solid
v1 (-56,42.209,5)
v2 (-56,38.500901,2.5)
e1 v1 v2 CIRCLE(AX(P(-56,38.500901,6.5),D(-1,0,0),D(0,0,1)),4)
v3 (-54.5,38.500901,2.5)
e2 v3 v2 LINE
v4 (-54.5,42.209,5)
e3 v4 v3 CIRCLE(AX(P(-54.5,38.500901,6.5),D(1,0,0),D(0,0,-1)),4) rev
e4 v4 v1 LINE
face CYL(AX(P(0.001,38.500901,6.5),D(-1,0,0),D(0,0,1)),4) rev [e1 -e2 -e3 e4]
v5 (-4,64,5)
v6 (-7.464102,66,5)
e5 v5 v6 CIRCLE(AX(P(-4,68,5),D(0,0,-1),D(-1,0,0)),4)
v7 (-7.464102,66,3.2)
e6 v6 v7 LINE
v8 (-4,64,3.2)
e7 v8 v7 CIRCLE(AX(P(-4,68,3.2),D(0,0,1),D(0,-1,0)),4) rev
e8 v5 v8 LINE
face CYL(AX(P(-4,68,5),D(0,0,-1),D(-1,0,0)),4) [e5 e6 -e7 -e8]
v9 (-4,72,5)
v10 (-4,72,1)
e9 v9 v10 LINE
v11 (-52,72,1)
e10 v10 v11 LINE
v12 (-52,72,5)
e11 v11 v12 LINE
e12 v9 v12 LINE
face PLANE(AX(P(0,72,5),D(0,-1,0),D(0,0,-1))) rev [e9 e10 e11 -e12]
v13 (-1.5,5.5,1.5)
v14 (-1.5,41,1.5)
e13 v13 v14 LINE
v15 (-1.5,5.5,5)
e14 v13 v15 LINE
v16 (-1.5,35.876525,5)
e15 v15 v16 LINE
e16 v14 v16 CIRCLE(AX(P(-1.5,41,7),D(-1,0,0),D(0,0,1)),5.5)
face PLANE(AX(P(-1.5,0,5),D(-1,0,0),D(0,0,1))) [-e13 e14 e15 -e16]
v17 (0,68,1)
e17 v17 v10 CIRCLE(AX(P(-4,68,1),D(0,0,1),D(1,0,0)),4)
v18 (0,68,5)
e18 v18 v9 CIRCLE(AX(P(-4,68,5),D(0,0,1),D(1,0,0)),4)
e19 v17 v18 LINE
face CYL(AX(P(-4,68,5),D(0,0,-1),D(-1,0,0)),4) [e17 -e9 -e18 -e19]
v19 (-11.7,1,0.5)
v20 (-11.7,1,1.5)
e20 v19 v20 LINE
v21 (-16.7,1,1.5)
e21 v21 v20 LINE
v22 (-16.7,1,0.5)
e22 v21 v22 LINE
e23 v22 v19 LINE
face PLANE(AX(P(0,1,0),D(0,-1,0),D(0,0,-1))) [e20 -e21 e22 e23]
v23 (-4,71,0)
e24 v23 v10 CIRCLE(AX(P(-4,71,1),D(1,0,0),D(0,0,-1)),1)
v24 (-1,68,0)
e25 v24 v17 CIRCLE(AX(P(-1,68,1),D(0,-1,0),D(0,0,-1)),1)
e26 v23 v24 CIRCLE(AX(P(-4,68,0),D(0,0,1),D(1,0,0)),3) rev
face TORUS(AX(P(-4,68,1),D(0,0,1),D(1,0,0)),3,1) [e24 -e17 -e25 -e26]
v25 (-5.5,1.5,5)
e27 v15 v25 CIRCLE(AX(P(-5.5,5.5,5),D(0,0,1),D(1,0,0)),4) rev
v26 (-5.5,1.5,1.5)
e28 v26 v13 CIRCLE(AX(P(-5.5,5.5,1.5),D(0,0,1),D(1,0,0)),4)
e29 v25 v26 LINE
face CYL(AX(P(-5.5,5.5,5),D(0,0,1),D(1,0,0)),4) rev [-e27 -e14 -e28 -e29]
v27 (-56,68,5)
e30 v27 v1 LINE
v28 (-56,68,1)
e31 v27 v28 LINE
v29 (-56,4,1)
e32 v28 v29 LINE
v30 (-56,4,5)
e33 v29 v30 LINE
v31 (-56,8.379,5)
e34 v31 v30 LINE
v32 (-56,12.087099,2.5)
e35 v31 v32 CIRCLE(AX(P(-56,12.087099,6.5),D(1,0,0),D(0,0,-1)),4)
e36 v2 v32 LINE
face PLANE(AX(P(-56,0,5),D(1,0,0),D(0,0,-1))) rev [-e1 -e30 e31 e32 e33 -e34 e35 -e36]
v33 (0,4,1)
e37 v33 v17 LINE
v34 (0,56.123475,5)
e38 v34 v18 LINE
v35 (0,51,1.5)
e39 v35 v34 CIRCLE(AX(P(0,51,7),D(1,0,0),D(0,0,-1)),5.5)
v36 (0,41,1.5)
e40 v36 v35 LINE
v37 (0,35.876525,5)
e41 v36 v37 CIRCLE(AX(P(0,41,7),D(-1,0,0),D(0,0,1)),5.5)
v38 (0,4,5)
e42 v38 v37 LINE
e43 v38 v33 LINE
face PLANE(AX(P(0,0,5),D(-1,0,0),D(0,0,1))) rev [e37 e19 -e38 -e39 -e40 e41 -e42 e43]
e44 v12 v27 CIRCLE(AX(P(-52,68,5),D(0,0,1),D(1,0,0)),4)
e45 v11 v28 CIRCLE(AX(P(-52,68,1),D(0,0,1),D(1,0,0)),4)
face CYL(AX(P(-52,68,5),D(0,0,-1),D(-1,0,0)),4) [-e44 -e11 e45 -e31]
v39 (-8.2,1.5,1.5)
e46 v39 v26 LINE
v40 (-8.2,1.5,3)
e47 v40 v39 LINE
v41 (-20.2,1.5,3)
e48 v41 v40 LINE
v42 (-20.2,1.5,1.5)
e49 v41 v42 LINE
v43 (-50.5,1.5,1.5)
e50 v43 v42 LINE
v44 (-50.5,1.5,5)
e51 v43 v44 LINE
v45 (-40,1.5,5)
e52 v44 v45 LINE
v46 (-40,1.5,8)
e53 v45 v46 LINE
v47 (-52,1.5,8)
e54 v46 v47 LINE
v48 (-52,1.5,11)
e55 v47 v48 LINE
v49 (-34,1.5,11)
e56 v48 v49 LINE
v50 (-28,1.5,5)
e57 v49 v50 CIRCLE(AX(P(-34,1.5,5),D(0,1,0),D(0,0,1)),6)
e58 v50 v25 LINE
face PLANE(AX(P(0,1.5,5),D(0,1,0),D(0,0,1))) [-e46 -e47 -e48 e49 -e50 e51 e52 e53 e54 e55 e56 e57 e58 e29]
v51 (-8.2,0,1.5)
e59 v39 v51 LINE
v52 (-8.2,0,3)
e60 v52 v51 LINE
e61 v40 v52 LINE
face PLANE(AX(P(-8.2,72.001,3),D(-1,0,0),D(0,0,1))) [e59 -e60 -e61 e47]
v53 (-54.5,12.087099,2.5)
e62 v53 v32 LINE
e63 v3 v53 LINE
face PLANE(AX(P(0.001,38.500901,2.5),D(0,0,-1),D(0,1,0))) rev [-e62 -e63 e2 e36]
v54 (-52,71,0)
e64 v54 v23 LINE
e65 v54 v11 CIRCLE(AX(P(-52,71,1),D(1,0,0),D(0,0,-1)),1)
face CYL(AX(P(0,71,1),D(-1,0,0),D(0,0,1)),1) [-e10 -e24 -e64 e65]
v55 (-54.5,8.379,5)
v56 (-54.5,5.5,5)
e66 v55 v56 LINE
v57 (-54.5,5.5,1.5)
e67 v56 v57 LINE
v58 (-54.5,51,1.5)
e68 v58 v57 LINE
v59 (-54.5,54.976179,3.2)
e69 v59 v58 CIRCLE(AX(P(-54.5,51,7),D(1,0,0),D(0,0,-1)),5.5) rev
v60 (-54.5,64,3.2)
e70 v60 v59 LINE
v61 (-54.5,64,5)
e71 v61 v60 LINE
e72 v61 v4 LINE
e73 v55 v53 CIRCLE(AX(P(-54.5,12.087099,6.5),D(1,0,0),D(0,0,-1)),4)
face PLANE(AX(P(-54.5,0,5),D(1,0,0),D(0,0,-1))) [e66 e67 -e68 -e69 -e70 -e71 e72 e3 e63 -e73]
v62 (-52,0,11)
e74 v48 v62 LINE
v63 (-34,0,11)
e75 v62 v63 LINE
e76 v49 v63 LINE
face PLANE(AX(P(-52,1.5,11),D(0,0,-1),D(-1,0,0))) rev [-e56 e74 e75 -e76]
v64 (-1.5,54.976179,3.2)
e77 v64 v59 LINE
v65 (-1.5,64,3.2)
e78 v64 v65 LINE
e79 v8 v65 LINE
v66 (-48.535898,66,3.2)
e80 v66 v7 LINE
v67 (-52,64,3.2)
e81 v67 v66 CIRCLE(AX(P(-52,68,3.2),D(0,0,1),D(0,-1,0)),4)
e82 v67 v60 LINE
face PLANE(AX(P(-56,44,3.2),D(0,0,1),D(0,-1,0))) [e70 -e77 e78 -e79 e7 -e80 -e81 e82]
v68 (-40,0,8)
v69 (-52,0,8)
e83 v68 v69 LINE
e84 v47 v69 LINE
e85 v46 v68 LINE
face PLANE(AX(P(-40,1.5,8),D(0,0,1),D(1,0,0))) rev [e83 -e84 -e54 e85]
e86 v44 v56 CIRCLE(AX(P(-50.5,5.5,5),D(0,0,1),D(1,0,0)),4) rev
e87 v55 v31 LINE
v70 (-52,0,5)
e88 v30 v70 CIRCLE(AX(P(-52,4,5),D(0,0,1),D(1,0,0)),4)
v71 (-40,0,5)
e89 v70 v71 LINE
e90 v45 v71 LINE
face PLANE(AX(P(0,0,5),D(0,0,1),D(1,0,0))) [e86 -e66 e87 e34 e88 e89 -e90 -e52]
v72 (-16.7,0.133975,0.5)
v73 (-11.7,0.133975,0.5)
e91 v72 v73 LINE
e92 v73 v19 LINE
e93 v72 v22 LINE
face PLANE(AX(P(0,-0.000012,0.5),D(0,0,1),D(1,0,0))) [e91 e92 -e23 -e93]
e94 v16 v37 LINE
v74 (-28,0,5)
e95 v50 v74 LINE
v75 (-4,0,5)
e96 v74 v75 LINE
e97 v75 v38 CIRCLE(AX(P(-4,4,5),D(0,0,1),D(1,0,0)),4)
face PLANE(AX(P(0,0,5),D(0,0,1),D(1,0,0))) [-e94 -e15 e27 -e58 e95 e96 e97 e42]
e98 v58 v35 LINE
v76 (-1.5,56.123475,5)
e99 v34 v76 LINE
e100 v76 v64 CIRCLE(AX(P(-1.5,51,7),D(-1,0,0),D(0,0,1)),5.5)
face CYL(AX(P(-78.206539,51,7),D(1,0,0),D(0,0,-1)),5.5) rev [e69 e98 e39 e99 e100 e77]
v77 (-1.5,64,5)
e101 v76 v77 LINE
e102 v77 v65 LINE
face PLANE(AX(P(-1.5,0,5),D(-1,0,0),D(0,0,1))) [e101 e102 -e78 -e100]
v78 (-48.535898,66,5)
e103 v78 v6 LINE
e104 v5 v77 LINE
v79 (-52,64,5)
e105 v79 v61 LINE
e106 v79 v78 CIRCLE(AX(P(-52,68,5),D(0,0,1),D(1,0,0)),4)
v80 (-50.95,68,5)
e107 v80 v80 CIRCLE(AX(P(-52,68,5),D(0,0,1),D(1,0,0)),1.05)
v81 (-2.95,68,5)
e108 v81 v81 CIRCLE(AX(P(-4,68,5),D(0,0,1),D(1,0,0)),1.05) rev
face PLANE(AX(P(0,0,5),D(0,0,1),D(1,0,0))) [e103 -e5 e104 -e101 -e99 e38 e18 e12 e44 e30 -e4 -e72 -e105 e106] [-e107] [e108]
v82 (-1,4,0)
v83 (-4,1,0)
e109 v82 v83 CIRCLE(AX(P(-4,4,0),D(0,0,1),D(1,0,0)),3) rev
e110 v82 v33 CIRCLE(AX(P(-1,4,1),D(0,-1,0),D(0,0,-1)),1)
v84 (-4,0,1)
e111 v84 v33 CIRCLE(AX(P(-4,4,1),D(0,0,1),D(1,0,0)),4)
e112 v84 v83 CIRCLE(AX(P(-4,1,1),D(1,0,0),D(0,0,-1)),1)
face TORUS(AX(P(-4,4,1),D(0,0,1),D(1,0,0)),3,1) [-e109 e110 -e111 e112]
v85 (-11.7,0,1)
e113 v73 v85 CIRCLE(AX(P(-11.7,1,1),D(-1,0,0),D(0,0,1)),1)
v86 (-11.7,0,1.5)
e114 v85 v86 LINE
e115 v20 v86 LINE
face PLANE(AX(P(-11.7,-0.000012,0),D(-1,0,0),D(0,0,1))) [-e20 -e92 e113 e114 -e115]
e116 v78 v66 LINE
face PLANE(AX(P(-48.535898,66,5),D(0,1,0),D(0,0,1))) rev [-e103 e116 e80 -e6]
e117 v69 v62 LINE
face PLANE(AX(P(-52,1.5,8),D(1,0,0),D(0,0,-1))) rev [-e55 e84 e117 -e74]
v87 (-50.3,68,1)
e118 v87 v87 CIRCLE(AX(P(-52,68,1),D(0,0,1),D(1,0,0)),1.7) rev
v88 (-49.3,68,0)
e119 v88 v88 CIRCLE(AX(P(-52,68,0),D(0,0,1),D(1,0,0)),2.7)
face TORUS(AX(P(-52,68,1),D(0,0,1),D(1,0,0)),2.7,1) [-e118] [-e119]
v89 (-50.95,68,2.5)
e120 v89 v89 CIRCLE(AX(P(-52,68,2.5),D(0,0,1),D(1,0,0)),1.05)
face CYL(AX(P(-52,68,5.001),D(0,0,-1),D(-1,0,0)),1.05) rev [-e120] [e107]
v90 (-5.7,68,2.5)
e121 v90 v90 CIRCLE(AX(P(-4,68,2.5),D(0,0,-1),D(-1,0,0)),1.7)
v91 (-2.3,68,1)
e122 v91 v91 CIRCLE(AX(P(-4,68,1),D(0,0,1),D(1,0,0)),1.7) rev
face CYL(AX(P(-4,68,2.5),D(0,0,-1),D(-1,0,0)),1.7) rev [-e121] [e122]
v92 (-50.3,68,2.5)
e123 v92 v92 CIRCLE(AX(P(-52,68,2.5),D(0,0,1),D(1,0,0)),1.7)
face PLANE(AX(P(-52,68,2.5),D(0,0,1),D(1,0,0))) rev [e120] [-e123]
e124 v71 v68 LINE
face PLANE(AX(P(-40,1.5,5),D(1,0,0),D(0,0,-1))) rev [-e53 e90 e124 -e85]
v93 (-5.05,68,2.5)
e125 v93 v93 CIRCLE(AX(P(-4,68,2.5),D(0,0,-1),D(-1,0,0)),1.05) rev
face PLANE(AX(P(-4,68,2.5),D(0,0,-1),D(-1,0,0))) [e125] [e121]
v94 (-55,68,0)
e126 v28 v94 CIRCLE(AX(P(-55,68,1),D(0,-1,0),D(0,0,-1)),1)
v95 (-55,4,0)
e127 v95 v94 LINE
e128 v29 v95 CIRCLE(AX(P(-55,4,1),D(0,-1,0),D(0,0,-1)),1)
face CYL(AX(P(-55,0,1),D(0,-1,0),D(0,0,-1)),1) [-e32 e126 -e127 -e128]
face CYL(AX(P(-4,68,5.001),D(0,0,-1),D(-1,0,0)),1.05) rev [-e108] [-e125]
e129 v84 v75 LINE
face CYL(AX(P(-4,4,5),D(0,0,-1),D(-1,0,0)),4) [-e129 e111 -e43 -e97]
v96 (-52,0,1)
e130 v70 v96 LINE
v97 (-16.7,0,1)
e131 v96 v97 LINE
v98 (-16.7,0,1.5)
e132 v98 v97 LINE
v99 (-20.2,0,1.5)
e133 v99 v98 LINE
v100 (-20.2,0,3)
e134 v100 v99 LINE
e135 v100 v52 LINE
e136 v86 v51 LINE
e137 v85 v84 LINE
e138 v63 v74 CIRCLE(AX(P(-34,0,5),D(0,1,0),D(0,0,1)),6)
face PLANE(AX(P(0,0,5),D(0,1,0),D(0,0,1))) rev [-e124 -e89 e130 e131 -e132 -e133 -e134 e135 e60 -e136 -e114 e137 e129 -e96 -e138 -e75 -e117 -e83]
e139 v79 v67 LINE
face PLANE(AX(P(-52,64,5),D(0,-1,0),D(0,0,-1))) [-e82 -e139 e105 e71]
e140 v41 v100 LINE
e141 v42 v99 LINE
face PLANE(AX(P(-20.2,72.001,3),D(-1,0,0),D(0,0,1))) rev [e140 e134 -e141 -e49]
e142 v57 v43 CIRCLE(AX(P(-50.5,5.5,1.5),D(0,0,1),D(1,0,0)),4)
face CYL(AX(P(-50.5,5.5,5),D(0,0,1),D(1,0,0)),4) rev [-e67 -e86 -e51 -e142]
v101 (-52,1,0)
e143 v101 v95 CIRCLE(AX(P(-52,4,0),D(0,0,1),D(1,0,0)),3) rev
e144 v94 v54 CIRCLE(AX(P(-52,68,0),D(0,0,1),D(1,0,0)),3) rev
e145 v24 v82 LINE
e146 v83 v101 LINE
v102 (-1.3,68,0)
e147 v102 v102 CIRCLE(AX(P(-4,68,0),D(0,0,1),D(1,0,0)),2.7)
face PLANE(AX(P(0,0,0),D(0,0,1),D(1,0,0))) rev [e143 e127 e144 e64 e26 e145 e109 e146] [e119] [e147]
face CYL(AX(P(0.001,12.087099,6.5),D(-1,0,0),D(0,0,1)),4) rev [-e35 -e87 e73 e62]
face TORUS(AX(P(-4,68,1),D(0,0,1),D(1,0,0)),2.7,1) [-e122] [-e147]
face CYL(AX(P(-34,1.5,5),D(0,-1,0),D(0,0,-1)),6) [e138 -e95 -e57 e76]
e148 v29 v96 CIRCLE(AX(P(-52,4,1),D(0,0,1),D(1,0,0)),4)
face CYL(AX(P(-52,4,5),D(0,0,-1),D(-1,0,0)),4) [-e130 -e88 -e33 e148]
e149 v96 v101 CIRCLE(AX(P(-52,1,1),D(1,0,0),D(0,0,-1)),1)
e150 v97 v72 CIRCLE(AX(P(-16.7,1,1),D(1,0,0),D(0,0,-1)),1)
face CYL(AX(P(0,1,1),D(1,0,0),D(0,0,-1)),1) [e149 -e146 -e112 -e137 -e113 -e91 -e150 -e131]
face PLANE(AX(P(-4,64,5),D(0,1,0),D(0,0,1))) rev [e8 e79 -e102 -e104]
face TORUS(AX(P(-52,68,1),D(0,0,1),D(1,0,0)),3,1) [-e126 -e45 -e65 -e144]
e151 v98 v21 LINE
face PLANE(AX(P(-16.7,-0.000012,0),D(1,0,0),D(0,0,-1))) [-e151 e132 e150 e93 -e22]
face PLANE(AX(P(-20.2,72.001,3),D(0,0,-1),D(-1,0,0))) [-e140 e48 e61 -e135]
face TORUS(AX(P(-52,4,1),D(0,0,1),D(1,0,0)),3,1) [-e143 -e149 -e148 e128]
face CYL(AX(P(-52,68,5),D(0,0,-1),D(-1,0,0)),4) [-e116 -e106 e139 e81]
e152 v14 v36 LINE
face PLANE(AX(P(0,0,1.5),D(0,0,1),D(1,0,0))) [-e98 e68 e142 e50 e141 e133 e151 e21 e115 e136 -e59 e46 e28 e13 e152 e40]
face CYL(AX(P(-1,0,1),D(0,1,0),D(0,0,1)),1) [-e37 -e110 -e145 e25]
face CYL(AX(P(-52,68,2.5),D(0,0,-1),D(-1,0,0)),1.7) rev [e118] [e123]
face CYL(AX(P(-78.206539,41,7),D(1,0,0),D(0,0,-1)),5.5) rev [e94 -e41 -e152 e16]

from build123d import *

# Parameters (mm, degrees)
SKETCH_1_W               = 56
SKETCH_1_H               = 72
EXTRUDE_1_DEPTH          = 5
SHELL_1_T                = -1.5
EXTRUDE_2_DEPTH          = 5
EXTRUDE_4_REACH          = 93.351
SKETCH_11_W              = 3.2
SKETCH_11_H              = 28
CUT_EXTRUDE_1_REACH      = 93.351
SKETCH_2_7_R             = 1.05
SKETCH_2_8_R             = 1.7
CUT_EXTRUDE_2_DEPTH      = 2.5
EXTRUDE_3_DEPTH          = 1.5
CUT_EXTRUDE_3_REACH      = 93.875
SKETCH_10_3_W            = 12
SKETCH_10_3_H            = 1.5
CUT_EXTRUDE_4_DEPTH      = 92.874914966
CUT_EXTRUDE_4_DEPTH_BACK = 1
SKETCH_10_4_W            = 5
SKETCH_10_4_H            = 1
CUT_EXTRUDE_5_REACH      = 93.875
CUT_EXTRUDE_START        = -54.5
CUT_EXTRUDE_6_DEPTH      = 54.5
FILLET_1_R               = 4
FILLET_2_R               = 4
FILLET_3_R               = 1


with BuildPart() as part:
    # 草图1 → 凸台-拉伸1 (new body)
    with BuildSketch(Plane.XY):
        with Locations((-28, 36)):
            Rectangle(SKETCH_1_W, SKETCH_1_H)
    extrude(amount=EXTRUDE_1_DEPTH)

    # 抽壳1
    shell_1_openings = [part.faces().sort_by_distance(p)[0] for p in [
        (-28, 36, 5),
    ]]
    offset(amount=SHELL_1_T, openings=shell_1_openings, kind=Kind.INTERSECTION)

    # 草图2 → 凸台-拉伸2 (add)
    with BuildSketch(Plane.XY):
        with BuildLine():
            Line((0, 72), (0, 68))
            ThreePointArc((0, 68), (-0.394448725, 66.267949192), (-1.5, 64.877501001))
            Line((-1.5, 64.877501001), (-1.5, 64))
            Line((-1.5, 64), (-4, 64))
            ThreePointArc((-4, 64), (-6, 64.535898385), (-7.464101615, 66))
            Line((-7.464101615, 66), (-48.535898385, 66))
            ThreePointArc((-48.535898385, 66), (-50, 64.535898385), (-52, 64))
            Line((-52, 64), (-54.5, 64))
            Line((-54.5, 64), (-54.5, 64.877501001))
            ThreePointArc((-54.5, 64.877501001), (-55.605551275, 66.267949192), (-56, 68))
            Line((-56, 68), (-56, 72))
            Line((-56, 72), (0, 72))
        make_face()
    extrude(amount=EXTRUDE_2_DEPTH)

    # 草图11 → 凸台-拉伸4 (add, up to next)
    with BuildSketch(Plane(origin=(0, 0, 0), x_dir=(0, 0, -1), z_dir=(1, 0, 0)), mode=Mode.PRIVATE) as extrude_4_sk1:
        with Locations((-1.6, 58)):
            Rectangle(SKETCH_11_W, SKETCH_11_H)
    extrude_4_tool1 = extrude(extrude_4_sk1.sketch, amount=-EXTRUDE_4_REACH, mode=Mode.PRIVATE) - part.part
    add(extrude_4_tool1.solids().sort_by_distance((0, 58, 1.6))[0])

    # 草图2<7> → 切除-拉伸1 (cut, up to next)
    with BuildSketch(Plane.XY, mode=Mode.PRIVATE) as cut_extrude_1_sk1:
        with Locations((-52, 68)):
            Circle(SKETCH_2_7_R)
    cut_extrude_1_tool1 = extrude(cut_extrude_1_sk1.sketch, amount=CUT_EXTRUDE_1_REACH, mode=Mode.PRIVATE) & part.part
    # 草图2<7> → 切除-拉伸1 (cut, up to next)
    with BuildSketch(Plane.XY, mode=Mode.PRIVATE) as cut_extrude_1_sk2:
        with Locations(Location((-4, 68, 0), (0, 0, 180))):
            Circle(SKETCH_2_7_R)
    cut_extrude_1_tool2 = extrude(cut_extrude_1_sk2.sketch, amount=CUT_EXTRUDE_1_REACH, mode=Mode.PRIVATE) & part.part
    add(cut_extrude_1_tool1.solids().sort_by_distance((-52, 68, 0))[0], mode=Mode.SUBTRACT)
    add(cut_extrude_1_tool2.solids().sort_by_distance((-4, 68, 0))[0], mode=Mode.SUBTRACT)

    # 草图2<8> → 切除-拉伸2 (cut)
    with BuildSketch(Plane.XY):
        with Locations((-52, 68)):
            Circle(SKETCH_2_8_R)
        with Locations(Location((-4, 68, 0), (0, 0, 180))):
            Circle(SKETCH_2_8_R)
    extrude(amount=CUT_EXTRUDE_2_DEPTH, mode=Mode.SUBTRACT)

    # 草图10 → 凸台-拉伸3 (add)
    with BuildSketch(Plane.XZ):
        with BuildLine():
            Line((-40, 5), (-40, 8))
            Line((-40, 8), (-52, 8))
            Line((-52, 8), (-52, 11))
            Line((-52, 11), (-34, 11))
            ThreePointArc((-34, 11), (-29.757359313, 9.242640687), (-28, 5))
            Line((-28, 5), (-40, 5))
        make_face()
    extrude(amount=-EXTRUDE_3_DEPTH)

    # 草图10<3> → 切除-拉伸3 (cut, up to next)
    with BuildSketch(Plane.XZ, mode=Mode.PRIVATE) as cut_extrude_3_sk1:
        with Locations((-14.2, 2.25)):
            Rectangle(SKETCH_10_3_W, SKETCH_10_3_H)
    cut_extrude_3_tool1 = extrude(cut_extrude_3_sk1.sketch, amount=-CUT_EXTRUDE_3_REACH, mode=Mode.PRIVATE) & part.part
    add(cut_extrude_3_tool1.solids().sort_by_distance((-14.2, 0, 2.25))[0], mode=Mode.SUBTRACT)

    # 草图10<4> → 切除-拉伸4 (cut, two sides: drawn at the far end of the back side and taken through both)
    with BuildSketch(Plane.XZ.offset(-CUT_EXTRUDE_4_DEPTH_BACK)):
        with Locations((-14.2, 1)):
            Rectangle(SKETCH_10_4_W, SKETCH_10_4_H)
    extrude(amount=CUT_EXTRUDE_4_DEPTH + CUT_EXTRUDE_4_DEPTH_BACK, mode=Mode.SUBTRACT)

    # 草图8 → 切除-拉伸5 (cut, up to next)
    with BuildSketch(Plane.ZY.offset(56), mode=Mode.PRIVATE) as cut_extrude_5_sk1:
        with BuildLine():
            Line((2.5, 38.500900756), (2.5, 12.087099244))
            ThreePointArc((2.5, 12.087099244), (3.18337521, 9.851031266), (5, 8.379))
            Line((5, 8.379), (5, 42.209))
            ThreePointArc((5, 42.209), (3.18337521, 40.736968734), (2.5, 38.500900756))
        make_face()
    cut_extrude_5_tool1 = extrude(cut_extrude_5_sk1.sketch, amount=-CUT_EXTRUDE_5_REACH, mode=Mode.PRIVATE) & part.part
    add(cut_extrude_5_tool1.solids().sort_by_distance((-56, 25.294, 3.786685))[0], mode=Mode.SUBTRACT)

    # 草图9 → 切除-拉伸6 (cut)
    with BuildSketch(Plane(origin=(0, 0, 0), x_dir=(0, 0, -1), z_dir=(1, 0, 0)).offset(CUT_EXTRUDE_START)):
        with BuildLine():
            Line((-1.5, 41), (-1.5, 51))
            ThreePointArc((-1.5, 51), (-7, 56.5), (-12.5, 51))
            Line((-12.5, 51), (-12.5, 41))
            ThreePointArc((-12.5, 41), (-7, 35.5), (-1.5, 41))
        make_face()
    extrude(amount=CUT_EXTRUDE_6_DEPTH, mode=Mode.SUBTRACT)

    # 圆角1
    fillet_1_edges = [part.edges().sort_by_distance(p)[0] for p in [
        (0, 0, 2.5),
        (-56, 0, 2.5),
        (-56, 72, 2.5),
        (0, 72, 2.5),
    ]]
    fillet(fillet_1_edges, radius=FILLET_1_R)

    # 圆角2
    fillet_2_edges = [part.edges().sort_by_distance(p)[0] for p in [
        (-1.5, 1.5, 3.25),
        (-54.5, 1.5, 3.25),
    ]]
    fillet(fillet_2_edges, radius=FILLET_2_R)

    # 圆角3
    # the kernel refuses this fillet: 1 mm, written as the material it takes off along each edge
    with BuildSketch(Plane(origin=(-52, 68, 0), x_dir=(1, 0, 0), z_dir=(0, -1, 0))) as fillet_3_piece_1:
        with BuildLine():
            CenterArc((1.7 + FILLET_3_R, FILLET_3_R), FILLET_3_R, 180, 90)
            Line((1.7, FILLET_3_R), (1.7, 0))
            Line((1.7, 0), (1.7 + FILLET_3_R, 0))
        make_face()
    revolve(axis=Axis((-52, 68, 0), (0, 0, 1)), mode=Mode.SUBTRACT)
    with BuildSketch(Plane(origin=(-4, 68, 0), x_dir=(-1, 0, 0), z_dir=(0, 1, 0))) as fillet_3_piece_2:
        with BuildLine():
            CenterArc((1.7 + FILLET_3_R, FILLET_3_R), FILLET_3_R, 180, 90)
            Line((1.7, FILLET_3_R), (1.7, 0))
            Line((1.7, 0), (1.7 + FILLET_3_R, 0))
        make_face()
    revolve(axis=Axis((-4, 68, 0), (0, 0, 1)), mode=Mode.SUBTRACT)
    with BuildSketch(Plane(origin=(-4, 4, 0), x_dir=(0, -1, 0), z_dir=(-1, 0, 0))) as fillet_3_piece_3:
        with BuildLine():
            CenterArc((4 - FILLET_3_R, FILLET_3_R), FILLET_3_R, 270, 90)
            Line((4 - FILLET_3_R, 0), (4, 0))
            Line((4, 0), (4, FILLET_3_R))
        make_face()
    revolve(axis=Axis((-4, 4, 0), (0, 0, 1)), revolution_arc=90, mode=Mode.SUBTRACT)
    with BuildSketch(Plane(origin=(0, 4, 0), x_dir=(0, 0, 1), z_dir=(0, 1, 0))) as fillet_3_piece_4:
        with BuildLine():
            CenterArc((FILLET_3_R, -FILLET_3_R), FILLET_3_R, 90, 90)
            Line((0, -FILLET_3_R), (0, 0))
            Line((0, 0), (FILLET_3_R, 0))
        make_face()
    extrude(amount=64, mode=Mode.SUBTRACT)
    with BuildSketch(Plane(origin=(-4, 68, 0), x_dir=(0, 1, 0), z_dir=(-1, 0, 0))) as fillet_3_piece_5:
        with BuildLine():
            CenterArc((4 - FILLET_3_R, -FILLET_3_R), FILLET_3_R, 0, 90)
            Line((4, -FILLET_3_R), (4, 0))
            Line((4, 0), (4 - FILLET_3_R, 0))
        make_face()
    revolve(axis=Axis((-4, 68, 0), (0, 0, -1)), revolution_arc=90, mode=Mode.SUBTRACT)
    with BuildSketch(Plane(origin=(-52, 72, 0), x_dir=(0, -1, 0), z_dir=(1, 0, 0))) as fillet_3_piece_6:
        with BuildLine():
            CenterArc((FILLET_3_R, -FILLET_3_R), FILLET_3_R, 90, 90)
            Line((0, -FILLET_3_R), (0, 0))
            Line((0, 0), (FILLET_3_R, 0))
        make_face()
    extrude(amount=48, mode=Mode.SUBTRACT)
    with BuildSketch(Plane(origin=(-52, 68, 0), x_dir=(0, 1, 0), z_dir=(1, 0, 0))) as fillet_3_piece_7:
        with BuildLine():
            CenterArc((4 - FILLET_3_R, FILLET_3_R), FILLET_3_R, 270, 90)
            Line((4, FILLET_3_R), (4, 0))
            Line((4, 0), (4 - FILLET_3_R, 0))
        make_face()
    revolve(axis=Axis((-52, 68, 0), (0, 0, 1)), revolution_arc=90, mode=Mode.SUBTRACT)
    with BuildSketch(Plane(origin=(-56, 68, 0), x_dir=(1, 0, 0), z_dir=(0, -1, 0))) as fillet_3_piece_8:
        with BuildLine():
            CenterArc((FILLET_3_R, FILLET_3_R), FILLET_3_R, 180, 90)
            Line((0, FILLET_3_R), (0, 0))
            Line((0, 0), (FILLET_3_R, 0))
        make_face()
    extrude(amount=64, mode=Mode.SUBTRACT)
    with BuildSketch(Plane(origin=(-52, 4, 0), x_dir=(0, -1, 0), z_dir=(1, 0, 0))) as fillet_3_piece_9:
        with BuildLine():
            CenterArc((4 - FILLET_3_R, -FILLET_3_R), FILLET_3_R, 0, 90)
            Line((4, -FILLET_3_R), (4, 0))
            Line((4, 0), (4 - FILLET_3_R, 0))
        make_face()
    revolve(axis=Axis((-52, 4, 0), (0, 0, -1)), revolution_arc=90, mode=Mode.SUBTRACT)
    with BuildSketch(Plane(origin=(-4, 0, 0), x_dir=(0, 0, 1), z_dir=(-1, 0, 0))) as fillet_3_piece_10:
        with BuildLine():
            CenterArc((FILLET_3_R, FILLET_3_R), FILLET_3_R, 180, 90)
            Line((0, FILLET_3_R), (0, 0))
            Line((0, 0), (FILLET_3_R, 0))
        make_face()
    extrude(amount=48, mode=Mode.SUBTRACT)


solid = part.part
